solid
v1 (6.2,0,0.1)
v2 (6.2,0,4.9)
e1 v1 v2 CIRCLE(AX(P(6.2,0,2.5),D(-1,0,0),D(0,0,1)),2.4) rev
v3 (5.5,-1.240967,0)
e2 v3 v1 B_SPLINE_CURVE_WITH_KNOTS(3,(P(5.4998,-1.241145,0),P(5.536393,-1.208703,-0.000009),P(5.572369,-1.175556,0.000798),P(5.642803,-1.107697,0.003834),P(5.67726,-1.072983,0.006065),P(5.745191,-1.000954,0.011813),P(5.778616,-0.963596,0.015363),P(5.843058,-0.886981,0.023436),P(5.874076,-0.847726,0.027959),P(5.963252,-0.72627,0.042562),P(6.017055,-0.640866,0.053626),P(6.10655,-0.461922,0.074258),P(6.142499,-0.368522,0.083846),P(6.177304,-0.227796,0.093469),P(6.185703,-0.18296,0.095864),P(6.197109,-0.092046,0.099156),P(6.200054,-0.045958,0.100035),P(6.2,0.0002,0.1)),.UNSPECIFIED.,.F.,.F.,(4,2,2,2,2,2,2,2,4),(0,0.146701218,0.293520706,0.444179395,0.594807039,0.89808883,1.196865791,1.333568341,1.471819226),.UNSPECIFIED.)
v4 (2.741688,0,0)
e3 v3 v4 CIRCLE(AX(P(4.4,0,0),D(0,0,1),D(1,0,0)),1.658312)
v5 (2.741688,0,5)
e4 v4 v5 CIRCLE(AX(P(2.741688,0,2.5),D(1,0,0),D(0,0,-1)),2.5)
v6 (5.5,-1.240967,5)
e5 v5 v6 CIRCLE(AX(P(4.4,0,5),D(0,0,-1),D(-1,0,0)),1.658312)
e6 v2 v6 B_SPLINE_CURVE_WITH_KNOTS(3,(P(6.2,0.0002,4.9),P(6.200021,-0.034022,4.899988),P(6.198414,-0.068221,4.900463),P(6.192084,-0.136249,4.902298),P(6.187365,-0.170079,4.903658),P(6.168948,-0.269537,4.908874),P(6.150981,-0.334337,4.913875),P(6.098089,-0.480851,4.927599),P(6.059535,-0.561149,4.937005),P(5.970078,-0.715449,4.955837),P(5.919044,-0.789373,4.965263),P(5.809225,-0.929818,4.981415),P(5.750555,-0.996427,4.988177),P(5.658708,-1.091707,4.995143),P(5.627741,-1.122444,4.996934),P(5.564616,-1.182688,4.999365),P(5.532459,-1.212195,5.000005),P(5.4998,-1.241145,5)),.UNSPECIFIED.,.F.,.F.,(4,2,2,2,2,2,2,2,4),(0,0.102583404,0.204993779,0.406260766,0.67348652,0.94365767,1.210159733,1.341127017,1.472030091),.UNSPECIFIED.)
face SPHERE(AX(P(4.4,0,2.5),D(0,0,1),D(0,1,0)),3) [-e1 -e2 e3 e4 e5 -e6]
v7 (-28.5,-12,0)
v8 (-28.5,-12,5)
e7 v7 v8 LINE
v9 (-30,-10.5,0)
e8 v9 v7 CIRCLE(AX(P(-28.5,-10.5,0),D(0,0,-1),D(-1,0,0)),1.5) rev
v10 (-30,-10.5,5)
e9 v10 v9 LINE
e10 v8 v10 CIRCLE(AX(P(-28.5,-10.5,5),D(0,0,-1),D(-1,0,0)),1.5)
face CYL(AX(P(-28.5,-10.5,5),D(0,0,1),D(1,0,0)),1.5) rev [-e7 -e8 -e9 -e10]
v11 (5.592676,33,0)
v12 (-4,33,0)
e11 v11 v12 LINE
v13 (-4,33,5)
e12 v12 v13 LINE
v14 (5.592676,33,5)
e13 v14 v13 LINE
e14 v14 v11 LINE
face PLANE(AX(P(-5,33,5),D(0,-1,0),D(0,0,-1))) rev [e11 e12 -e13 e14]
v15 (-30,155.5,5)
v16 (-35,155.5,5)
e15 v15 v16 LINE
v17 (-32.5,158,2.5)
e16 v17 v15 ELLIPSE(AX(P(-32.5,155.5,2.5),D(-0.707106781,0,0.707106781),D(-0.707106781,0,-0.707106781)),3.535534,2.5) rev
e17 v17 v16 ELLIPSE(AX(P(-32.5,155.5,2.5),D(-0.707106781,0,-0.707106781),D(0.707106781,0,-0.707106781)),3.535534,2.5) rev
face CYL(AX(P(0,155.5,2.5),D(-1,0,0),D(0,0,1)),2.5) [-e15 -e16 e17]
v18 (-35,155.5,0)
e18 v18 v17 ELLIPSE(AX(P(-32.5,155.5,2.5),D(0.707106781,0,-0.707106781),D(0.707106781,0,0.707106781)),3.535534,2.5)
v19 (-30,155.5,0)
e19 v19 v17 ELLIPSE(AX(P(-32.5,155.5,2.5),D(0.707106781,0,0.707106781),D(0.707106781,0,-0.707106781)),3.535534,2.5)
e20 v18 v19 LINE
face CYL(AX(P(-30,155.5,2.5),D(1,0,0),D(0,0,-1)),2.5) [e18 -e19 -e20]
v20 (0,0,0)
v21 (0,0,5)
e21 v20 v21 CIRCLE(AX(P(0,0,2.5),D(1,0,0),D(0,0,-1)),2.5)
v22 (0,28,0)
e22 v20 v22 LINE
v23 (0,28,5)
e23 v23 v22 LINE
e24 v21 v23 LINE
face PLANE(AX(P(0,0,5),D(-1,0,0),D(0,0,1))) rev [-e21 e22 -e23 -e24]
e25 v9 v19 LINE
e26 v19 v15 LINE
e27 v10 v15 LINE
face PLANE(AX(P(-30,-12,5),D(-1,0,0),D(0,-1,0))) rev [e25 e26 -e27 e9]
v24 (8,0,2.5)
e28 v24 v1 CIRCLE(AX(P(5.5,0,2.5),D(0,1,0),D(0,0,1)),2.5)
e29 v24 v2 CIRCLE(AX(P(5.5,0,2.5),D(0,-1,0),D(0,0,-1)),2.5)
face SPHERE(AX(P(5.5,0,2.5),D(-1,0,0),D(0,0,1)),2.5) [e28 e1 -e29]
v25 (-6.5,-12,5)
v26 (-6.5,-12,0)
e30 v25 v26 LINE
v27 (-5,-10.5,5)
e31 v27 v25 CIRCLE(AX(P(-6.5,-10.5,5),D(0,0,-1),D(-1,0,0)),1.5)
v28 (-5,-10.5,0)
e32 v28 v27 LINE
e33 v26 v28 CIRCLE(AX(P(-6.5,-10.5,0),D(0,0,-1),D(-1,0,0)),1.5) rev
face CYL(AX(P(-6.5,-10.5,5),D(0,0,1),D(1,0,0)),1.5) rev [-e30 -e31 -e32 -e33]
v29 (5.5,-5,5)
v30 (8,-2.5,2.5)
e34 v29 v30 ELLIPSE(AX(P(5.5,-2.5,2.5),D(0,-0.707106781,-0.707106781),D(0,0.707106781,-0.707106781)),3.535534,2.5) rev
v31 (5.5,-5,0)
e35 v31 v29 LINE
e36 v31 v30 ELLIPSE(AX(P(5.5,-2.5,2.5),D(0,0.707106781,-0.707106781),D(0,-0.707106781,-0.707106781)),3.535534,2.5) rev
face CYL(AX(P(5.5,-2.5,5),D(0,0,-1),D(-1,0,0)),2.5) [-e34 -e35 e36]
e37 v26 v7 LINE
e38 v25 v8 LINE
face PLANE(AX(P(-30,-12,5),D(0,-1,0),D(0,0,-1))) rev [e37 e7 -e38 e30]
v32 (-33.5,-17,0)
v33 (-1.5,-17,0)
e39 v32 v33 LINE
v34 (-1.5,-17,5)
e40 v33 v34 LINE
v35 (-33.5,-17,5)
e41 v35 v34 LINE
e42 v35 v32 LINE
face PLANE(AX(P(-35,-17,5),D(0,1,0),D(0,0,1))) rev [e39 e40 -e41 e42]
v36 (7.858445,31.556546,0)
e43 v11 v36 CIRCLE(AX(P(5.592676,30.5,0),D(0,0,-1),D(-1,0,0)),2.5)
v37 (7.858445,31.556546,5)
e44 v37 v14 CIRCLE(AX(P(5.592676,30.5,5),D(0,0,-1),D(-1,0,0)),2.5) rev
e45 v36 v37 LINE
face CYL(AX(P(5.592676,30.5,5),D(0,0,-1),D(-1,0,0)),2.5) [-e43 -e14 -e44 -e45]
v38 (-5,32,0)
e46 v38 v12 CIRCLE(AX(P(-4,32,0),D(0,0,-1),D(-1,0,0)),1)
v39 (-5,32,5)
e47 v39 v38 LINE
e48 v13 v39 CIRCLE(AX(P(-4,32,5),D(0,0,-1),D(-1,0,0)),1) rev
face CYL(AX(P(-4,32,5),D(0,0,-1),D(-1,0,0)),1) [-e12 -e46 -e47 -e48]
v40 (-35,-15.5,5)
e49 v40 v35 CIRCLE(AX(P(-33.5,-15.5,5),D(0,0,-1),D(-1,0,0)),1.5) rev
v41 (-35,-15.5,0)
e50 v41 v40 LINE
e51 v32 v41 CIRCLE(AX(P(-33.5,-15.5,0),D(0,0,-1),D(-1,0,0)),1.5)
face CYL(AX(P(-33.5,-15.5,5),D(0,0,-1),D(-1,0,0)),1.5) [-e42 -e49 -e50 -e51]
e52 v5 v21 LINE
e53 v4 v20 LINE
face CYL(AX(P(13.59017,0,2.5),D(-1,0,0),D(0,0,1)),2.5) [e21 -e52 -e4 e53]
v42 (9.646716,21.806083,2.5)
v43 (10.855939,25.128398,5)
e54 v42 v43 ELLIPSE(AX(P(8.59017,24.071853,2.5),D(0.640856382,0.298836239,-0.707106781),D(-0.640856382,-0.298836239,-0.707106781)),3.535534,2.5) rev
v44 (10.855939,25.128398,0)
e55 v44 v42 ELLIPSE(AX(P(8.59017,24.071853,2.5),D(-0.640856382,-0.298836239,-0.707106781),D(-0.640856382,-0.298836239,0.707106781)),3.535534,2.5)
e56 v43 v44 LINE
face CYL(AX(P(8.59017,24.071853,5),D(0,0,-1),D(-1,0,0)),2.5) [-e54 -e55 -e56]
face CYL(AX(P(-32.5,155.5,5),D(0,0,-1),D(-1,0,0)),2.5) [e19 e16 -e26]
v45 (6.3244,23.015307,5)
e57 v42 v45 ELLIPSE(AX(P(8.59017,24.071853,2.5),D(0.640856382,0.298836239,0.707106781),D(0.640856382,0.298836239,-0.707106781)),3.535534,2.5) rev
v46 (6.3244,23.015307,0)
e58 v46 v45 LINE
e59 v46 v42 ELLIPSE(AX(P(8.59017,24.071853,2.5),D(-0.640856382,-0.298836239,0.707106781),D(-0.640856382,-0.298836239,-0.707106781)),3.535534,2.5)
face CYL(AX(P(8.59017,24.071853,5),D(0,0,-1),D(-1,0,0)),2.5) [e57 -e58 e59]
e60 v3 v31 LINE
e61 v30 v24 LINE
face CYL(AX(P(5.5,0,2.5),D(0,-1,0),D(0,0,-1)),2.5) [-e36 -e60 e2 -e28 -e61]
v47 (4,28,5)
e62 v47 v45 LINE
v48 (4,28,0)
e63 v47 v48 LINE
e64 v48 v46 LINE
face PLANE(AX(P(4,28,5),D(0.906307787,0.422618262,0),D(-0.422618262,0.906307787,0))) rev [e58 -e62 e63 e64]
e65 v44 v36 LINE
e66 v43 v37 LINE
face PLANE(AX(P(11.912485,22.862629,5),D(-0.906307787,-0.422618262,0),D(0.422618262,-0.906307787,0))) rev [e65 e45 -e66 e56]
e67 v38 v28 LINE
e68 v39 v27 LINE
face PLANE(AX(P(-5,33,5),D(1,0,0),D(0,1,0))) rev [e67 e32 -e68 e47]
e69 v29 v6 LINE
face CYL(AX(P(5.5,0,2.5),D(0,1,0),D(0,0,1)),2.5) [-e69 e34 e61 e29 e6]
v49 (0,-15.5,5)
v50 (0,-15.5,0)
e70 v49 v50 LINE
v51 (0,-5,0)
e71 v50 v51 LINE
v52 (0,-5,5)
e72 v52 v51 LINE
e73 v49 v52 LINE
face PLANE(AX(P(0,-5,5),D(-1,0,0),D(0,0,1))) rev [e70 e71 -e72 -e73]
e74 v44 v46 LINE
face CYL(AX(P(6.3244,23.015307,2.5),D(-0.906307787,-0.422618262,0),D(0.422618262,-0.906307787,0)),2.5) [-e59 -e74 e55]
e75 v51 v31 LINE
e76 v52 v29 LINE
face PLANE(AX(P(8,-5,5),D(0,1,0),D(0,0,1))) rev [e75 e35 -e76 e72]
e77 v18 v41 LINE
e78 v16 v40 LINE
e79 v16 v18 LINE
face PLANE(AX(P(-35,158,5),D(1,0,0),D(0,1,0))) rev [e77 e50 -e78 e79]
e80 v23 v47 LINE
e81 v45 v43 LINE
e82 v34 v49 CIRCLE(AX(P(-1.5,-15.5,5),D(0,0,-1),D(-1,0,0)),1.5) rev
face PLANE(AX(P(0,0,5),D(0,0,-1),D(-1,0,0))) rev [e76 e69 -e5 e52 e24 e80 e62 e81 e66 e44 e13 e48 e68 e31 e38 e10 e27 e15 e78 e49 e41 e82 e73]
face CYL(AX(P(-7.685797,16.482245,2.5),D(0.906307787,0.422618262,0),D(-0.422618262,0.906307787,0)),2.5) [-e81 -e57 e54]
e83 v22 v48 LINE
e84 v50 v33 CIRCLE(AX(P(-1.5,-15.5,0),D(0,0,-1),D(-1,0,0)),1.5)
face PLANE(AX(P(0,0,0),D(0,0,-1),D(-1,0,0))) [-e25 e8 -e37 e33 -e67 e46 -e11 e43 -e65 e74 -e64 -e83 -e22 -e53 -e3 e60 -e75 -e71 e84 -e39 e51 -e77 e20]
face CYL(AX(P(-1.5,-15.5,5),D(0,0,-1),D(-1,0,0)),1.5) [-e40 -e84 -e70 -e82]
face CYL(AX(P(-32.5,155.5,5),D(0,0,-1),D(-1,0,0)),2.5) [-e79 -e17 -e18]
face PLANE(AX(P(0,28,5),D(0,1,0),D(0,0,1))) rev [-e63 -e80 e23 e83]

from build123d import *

# Parameters (mm, degrees)
EXTRUDE_1_DEPTH     = 5
FILLET_1_R          = 2.5
FILLET_2_R          = 1
EXTRUDE_2_DEPTH     = 8
FILLET_3_R          = 2.5
SKETCH_5_W          = 1.467751534
SKETCH_5_H          = 4.178210798
SKETCH_5_W_2        = 1.389566385
CUT_EXTRUDE_1_DEPTH = 20
FILLET_4_R          = 1.5
FILLET_5_R          = 1.5


with BuildPart() as part:
    # 草图1 → 凸台-拉伸1 (new body)
    with BuildSketch(Plane.XY):
        Polygon((0, 0), (0, 28), (4, 28), (7.380946094, 20.749537704), (11.912485029, 22.862629012), (7.185351304, 33), (-5, 33), (-5, -12), (-30, -12), (-30, 158), (-35, 158), (-35, -17), (0, -17), (0, -5), (8, -5), (8, 0), align=None)
    extrude(amount=EXTRUDE_1_DEPTH)

    # 圆角1
    fillet_1_edges = [part.edges().sort_by_distance(p)[0] for p in [
        (-32.5, 158, 0),
        (9.646715562, 21.806083358, 0),
        (9.646715562, 21.806083358, 5),
        (-35, 158, 2.5),
        (-30, 158, 2.5),
        (7.185351304, 33, 2.5),
        (11.912485029, 22.862629012, 2.5),
        (7.380946094, 20.749537704, 2.5),
        (-32.5, 158, 5),
    ]]
    fillet(fillet_1_edges, radius=FILLET_1_R - 0.0001)  # a hair under: the kernel refuses the full size

    # 圆角2
    fillet_2_edges = [part.edges().sort_by_distance(p)[0] for p in [
        (-5, 33, 2.5),
    ]]
    fillet(fillet_2_edges, radius=FILLET_2_R)

    # 草图3 → 凸台-拉伸2 (add)
    with BuildSketch(Plane(origin=(0, 0, 0), x_dir=(0, 0, -1), z_dir=(1, 0, 0))):
        with BuildLine():
            Line((-5, 0), (0, 0))
            ThreePointArc((0, 0), (-2.5, 2.5), (-5, 0))
        make_face()
    extrude(amount=EXTRUDE_2_DEPTH)

    # 圆角3
    fillet_3_edges = [part.edges().sort_by_distance(p)[0] for p in [
        (8, -2.5, 0),
        (8, -5, 2.5),
        (8, -2.5, 5),
        (8, 2.5, 2.5),
    ]]
    fillet(fillet_3_edges, radius=FILLET_3_R - 0.0001)  # a hair under: the kernel refuses the full size

    # 草图4 → 旋转3 (revolve)
    with BuildSketch(Plane(origin=(4.4, 0, 0), x_dir=(0, 0, -1), z_dir=(1, 0, 0))):
        with BuildLine():
            Line((-5.5, 0), (0.5, 0))
            ThreePointArc((0.5, 0), (-2.5, 3), (-5.5, 0))
        make_face()
    revolve(axis=Axis((4.4, 0, 2.5), (0, 0, -1)))

    # 草图5 → 切除-拉伸1 (cut)
    with BuildSketch(Plane.ZY.offset(5)):
        with Locations((-0.733875767, -0.010051234)):
            Rectangle(SKETCH_5_W, SKETCH_5_H)
        with Locations((5.694783193, -0.010051234)):
            Rectangle(SKETCH_5_W_2, SKETCH_5_H)
    extrude(amount=-CUT_EXTRUDE_1_DEPTH, mode=Mode.SUBTRACT)

    # 圆角4
    fillet_4_edges = [part.edges().sort_by_distance(p)[0] for p in [
        (-30, -12, 2.5),
        (-5, -12, 2.5),
    ]]
    fillet(fillet_4_edges, radius=FILLET_4_R)

    # 圆角5
    fillet_5_edges = [part.edges().sort_by_distance(p)[0] for p in [
        (0, -17, 2.5),
        (-35, -17, 2.5),
    ]]
    fillet(fillet_5_edges, radius=FILLET_5_R)


solid = part.part
